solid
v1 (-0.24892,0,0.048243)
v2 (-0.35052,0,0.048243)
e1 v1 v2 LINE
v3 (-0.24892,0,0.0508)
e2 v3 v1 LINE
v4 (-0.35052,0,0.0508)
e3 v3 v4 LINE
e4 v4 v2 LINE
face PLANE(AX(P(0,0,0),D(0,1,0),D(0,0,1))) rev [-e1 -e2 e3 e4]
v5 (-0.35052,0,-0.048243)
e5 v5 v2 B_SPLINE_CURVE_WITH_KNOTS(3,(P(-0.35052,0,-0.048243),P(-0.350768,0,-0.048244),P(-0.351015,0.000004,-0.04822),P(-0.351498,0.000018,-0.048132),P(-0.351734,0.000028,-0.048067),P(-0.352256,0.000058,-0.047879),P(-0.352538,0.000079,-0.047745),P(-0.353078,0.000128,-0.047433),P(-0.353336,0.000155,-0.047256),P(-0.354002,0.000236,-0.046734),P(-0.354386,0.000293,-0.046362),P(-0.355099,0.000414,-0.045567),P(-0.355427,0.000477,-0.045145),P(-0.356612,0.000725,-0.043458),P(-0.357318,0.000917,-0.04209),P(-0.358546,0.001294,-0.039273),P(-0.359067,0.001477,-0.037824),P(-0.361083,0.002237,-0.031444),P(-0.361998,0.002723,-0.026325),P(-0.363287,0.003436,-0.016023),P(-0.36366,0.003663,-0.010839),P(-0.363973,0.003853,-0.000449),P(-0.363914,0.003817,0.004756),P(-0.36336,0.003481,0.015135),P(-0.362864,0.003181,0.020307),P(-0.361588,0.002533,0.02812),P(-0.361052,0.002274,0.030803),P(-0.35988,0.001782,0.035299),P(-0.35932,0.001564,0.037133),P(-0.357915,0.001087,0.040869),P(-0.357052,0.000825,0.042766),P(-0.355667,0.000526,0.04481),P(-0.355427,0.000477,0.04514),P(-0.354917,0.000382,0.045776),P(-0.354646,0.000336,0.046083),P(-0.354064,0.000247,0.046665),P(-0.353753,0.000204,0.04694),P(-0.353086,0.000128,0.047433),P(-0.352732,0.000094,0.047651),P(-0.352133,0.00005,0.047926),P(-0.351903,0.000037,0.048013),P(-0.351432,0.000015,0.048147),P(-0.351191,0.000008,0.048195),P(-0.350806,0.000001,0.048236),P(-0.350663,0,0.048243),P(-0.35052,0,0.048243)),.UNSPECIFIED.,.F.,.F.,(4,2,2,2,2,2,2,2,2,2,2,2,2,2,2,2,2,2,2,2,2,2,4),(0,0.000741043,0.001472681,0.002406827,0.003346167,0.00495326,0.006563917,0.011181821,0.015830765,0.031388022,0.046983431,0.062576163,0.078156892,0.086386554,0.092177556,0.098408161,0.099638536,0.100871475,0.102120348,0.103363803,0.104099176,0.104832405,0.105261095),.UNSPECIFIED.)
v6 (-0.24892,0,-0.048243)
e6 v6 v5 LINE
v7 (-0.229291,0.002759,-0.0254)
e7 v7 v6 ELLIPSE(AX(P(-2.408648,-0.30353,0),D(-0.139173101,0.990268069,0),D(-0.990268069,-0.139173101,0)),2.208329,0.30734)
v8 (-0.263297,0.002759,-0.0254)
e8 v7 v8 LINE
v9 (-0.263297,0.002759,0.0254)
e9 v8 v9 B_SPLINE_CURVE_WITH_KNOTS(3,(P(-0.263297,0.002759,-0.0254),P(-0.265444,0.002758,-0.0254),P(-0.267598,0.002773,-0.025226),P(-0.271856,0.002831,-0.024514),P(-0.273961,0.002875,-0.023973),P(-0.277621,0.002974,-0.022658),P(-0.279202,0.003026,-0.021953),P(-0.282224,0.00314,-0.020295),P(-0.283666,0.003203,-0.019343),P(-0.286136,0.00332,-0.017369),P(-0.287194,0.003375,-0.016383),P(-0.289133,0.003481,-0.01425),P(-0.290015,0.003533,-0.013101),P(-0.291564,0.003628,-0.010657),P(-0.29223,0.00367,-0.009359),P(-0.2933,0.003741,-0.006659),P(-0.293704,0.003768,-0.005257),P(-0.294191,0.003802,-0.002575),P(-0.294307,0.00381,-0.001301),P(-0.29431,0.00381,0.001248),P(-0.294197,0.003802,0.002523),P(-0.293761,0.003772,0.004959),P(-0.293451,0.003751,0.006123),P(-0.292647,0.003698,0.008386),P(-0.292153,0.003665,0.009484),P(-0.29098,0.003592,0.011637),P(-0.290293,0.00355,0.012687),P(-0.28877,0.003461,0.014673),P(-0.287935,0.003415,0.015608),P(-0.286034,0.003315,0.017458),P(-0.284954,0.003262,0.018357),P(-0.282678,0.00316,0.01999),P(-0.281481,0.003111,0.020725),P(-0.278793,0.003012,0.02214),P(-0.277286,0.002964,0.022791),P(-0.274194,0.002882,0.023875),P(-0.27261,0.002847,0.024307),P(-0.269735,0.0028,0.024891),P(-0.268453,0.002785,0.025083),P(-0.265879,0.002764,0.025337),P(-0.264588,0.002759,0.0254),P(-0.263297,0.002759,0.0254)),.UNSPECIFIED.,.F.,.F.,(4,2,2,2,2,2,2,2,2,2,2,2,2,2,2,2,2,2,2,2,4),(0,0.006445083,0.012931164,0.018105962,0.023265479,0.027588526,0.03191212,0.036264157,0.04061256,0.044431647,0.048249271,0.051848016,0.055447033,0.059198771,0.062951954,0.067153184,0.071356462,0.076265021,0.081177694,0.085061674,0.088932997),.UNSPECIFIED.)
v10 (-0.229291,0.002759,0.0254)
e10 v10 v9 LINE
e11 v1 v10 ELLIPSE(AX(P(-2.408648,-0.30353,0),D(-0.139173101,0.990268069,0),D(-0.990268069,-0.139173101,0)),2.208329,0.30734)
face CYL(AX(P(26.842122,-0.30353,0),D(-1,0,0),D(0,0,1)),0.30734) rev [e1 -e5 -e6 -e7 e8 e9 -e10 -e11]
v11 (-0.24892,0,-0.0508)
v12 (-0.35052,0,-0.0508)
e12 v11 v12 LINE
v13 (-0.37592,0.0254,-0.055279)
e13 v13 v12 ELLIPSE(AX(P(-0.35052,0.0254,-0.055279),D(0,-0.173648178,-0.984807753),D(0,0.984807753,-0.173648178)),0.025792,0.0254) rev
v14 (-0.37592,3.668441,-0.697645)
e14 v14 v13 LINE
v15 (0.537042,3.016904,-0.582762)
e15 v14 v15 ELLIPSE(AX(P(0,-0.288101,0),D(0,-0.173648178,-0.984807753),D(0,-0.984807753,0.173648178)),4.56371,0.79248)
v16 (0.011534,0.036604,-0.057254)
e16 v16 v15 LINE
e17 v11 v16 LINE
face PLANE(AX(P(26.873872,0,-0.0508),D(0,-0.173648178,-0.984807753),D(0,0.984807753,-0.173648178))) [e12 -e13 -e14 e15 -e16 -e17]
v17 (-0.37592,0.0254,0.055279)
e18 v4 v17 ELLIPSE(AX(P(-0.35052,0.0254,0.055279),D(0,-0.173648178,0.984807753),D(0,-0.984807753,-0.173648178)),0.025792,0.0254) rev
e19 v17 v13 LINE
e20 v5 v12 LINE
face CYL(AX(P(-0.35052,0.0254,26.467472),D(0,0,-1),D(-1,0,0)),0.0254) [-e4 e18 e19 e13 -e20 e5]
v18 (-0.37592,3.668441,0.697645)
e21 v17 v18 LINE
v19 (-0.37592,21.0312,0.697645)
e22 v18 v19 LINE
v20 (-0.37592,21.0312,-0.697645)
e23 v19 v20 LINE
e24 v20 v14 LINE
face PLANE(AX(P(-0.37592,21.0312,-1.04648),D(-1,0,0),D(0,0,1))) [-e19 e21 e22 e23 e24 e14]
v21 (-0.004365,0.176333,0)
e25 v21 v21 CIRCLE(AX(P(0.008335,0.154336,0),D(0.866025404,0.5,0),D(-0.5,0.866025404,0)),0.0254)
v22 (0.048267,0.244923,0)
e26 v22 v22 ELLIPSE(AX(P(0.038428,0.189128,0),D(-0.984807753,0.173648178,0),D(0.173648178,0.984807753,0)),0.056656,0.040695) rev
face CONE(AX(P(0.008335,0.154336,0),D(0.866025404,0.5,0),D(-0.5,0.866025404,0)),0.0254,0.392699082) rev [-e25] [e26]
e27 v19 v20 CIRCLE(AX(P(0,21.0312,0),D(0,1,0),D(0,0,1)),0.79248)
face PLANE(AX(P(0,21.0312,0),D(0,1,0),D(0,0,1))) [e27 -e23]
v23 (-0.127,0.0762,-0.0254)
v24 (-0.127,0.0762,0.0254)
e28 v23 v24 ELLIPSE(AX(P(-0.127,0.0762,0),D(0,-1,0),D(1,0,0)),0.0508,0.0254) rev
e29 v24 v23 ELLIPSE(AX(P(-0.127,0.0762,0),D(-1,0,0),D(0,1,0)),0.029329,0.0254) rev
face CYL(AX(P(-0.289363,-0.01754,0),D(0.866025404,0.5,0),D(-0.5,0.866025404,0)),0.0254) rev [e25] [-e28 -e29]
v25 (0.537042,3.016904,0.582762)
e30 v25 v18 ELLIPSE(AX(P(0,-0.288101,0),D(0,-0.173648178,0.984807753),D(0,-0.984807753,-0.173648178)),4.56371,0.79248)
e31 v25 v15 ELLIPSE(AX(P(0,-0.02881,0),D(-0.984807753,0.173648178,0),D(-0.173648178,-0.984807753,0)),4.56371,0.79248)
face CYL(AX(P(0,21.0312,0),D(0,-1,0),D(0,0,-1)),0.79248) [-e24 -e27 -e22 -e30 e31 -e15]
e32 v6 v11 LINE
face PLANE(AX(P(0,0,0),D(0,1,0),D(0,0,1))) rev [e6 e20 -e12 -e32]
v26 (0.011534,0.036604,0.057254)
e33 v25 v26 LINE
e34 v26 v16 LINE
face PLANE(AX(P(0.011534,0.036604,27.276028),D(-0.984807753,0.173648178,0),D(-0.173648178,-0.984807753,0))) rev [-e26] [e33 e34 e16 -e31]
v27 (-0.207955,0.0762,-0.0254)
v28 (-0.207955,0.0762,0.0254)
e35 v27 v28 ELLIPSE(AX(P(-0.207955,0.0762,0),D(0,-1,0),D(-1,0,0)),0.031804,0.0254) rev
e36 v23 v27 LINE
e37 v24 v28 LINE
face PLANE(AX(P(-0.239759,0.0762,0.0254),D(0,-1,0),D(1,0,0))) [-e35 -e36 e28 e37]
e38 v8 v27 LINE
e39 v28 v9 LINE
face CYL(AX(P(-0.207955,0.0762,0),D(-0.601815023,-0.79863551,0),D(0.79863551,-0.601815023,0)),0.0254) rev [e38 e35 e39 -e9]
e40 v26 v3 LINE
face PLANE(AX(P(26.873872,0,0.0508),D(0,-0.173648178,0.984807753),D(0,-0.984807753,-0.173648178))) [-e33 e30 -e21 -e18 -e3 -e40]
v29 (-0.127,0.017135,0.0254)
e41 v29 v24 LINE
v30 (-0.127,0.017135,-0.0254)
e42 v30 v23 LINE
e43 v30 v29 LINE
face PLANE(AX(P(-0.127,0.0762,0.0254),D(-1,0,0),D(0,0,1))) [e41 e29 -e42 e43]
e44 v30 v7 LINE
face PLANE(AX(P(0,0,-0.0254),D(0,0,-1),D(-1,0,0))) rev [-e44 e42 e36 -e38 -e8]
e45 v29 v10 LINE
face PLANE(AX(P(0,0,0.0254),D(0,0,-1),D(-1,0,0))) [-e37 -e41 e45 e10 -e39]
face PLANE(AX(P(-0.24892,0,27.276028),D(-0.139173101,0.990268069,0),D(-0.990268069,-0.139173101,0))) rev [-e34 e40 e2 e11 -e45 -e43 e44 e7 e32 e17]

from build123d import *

# Parameters (mm, degrees)
TD_SKETCH_R                             = 0.79248
TL_FEATURE_DEPTH                        = 21.0312
TDF_STD_SKETCH_W                        = 2.09296
TDF_STD_SKETCH_H                        = 2.09296
TDF_STD_FEATURE_DEPTH                   = 22.061040395
ISA_20_STD_FEATURE_DEPTH                = 22.061040395
ISA_20_STD_FEATURE_DEPTH_BACK           = 22.061040395
F_10BA_STD_FEATURE_DEPTH                = 22.061040395
F_10BA_STD_FEATURE_DEPTH_BACK           = 22.061040395
FRO_STD_FEATURE_DEPTH                   = 22.061040395
FRO_STD_FEATURE_DEPTH_BACK              = 22.061040395
C_STD_FEATURE_DEPTH                     = 22.061040395
C_STD_FEATURE_DEPTH_BACK                = 22.061040395
ERW_STD_FEATURE_DEPTH                   = 0.0254
H_STD_FEATURE_REACH                     = 22.907
H_STD_SKETCH_R                          = 0.0254
H_STD_SKETCH_3_R                        = 0.0254
FUNNEL_FINAL_DIAMETRE_STD_FEATURE_DEPTH = 2.499995
FUNNEL_FINAL_DIAMETRE_STD_FEATURE_DRAFT = -22.5
ROUND_BR_STD_FEATURE_START              = -1
ROUND_BR_STD_FEATURE_DEPTH              = 0.984425518


with BuildPart() as part:
    # TD_sketch → TL_feature (new body)
    with BuildSketch(Plane(origin=(0, 0, 0), x_dir=(1, 0, 0), z_dir=(0, 1, 0))):
        with Locations(Location((0, 0, 0), (0, 0, 270))):
            Circle(TD_SKETCH_R)
    extrude(amount=TL_FEATURE_DEPTH)

    # TDF_STD_sketch → TDF_STD_feature (cut, through all)
    with BuildSketch(Plane(origin=(0, 0, 0), x_dir=(1, 0, 0), z_dir=(0, 1, 0))):
        with Locations((-1.4224, 0)):
            Rectangle(TDF_STD_SKETCH_W, TDF_STD_SKETCH_H)
    extrude(amount=TDF_STD_FEATURE_DEPTH, mode=Mode.SUBTRACT)

    # ISA_20_STD_sketch → ISA_20_STD_feature (cut, two sides: drawn at the far end of the back side and taken through both)
    with BuildSketch(Plane(origin=(0, 0, 0), x_dir=(0, 0, -1), z_dir=(1, 0, 0)).offset(-ISA_20_STD_FEATURE_DEPTH_BACK)):
        Polygon((-12.968809457, 73.261672178), (-3.759167997, 21.0312), (-0.0508, 0), (0.0508, 0), (3.759167997, 21.0312), (12.968809457, 73.261672178), (12.968809457, -32.810750623), (-12.968809457, -32.810750623), align=None)
    extrude(amount=ISA_20_STD_FEATURE_DEPTH + ISA_20_STD_FEATURE_DEPTH_BACK, mode=Mode.SUBTRACT)

    # 10BA_STD_sketch → 10BA_STD_feature (cut, two sides: drawn at the far end of the back side and taken through both)
    with BuildSketch(Plane.XY.offset(-F_10BA_STD_FEATURE_DEPTH_BACK)):
        Polygon((-53.226091717, 0), (-0.37592, 0), (-0.24892, 0), (0.011534356, 0.036604473), (3.713447997, 21.0312), (12.890784005, 73.078458855), (91.272293615, 2.163710365), (25.155417893, -70.914748491), align=None)
    extrude(amount=F_10BA_STD_FEATURE_DEPTH + F_10BA_STD_FEATURE_DEPTH_BACK, mode=Mode.SUBTRACT)

    # FRO_STD_sketch → FRO_STD_feature (cut, two sides: drawn at the far end of the back side and taken through both)
    with BuildSketch(Plane.XY.offset(-FRO_STD_FEATURE_DEPTH_BACK)):
        with BuildLine():
            Line((-0.37592, 52.149873762), (-0.37592, 0.0254))
            ThreePointArc((-0.37592, 0.0254), (-0.368480512, 0.007439488), (-0.35052, 0))
            Line((-0.35052, 0), (51.773953762, 0))
            Line((51.773953762, 0), (-21.941183964, -73.715137726))
            Line((-21.941183964, -73.715137726), (-74.091057726, -21.565263964))
            Line((-74.091057726, -21.565263964), (-0.37592, 52.149873762))
        make_face()
    extrude(amount=FRO_STD_FEATURE_DEPTH + FRO_STD_FEATURE_DEPTH_BACK, mode=Mode.SUBTRACT)

    # C_STD_sketch → C_STD_feature (cut, two sides: drawn at the far end of the back side and taken through both)
    with BuildSketch(Plane(origin=(0, 0, 0), x_dir=(0, 0, -1), z_dir=(1, 0, 0)).offset(-C_STD_FEATURE_DEPTH_BACK)):
        with BuildLine():
            Line((-51.498419713, -8.177529753), (-0.048243287, 0))
            ThreePointArc((-0.048243287, 0), (0, 0.00381), (0.048243287, 0))
            Line((0.048243287, 0), (51.498419713, -8.177529753))
            Line((51.498419713, -8.177529753), (51.498419713, -112.369518834))
            Line((51.498419713, -112.369518834), (-51.498419713, -112.369518834))
            Line((-51.498419713, -112.369518834), (-51.498419713, -8.177529753))
        make_face()
    extrude(amount=C_STD_FEATURE_DEPTH + C_STD_FEATURE_DEPTH_BACK, mode=Mode.SUBTRACT)


with BuildPart() as body_2:
    # ERW_STD_sketch → ERW_STD_feature (new, symmetric)
    with BuildSketch(Plane.XY):
        Polygon((-0.127, 0.0762), (-0.127, 0), (-0.29718, 0), (-0.239759181, 0.0762), align=None)
    extrude(amount=ERW_STD_FEATURE_DEPTH, both=True)

    # H_STD_sketch → H_STD_feature (add, up to next)
    with BuildSketch(Plane(origin=(0.008335492, 0.154335983, 0), x_dir=(0, 0, -1), z_dir=(0.8660254037844415, 0.4999999999999953, 0)), mode=Mode.PRIVATE) as h_std_feature_sk1:
        with Locations(Location((0, 0, 0), (0, 0, 90))):
            Circle(H_STD_SKETCH_R)
    h_std_feature_tool1 = extrude(h_std_feature_sk1.sketch, amount=-H_STD_FEATURE_REACH, mode=Mode.PRIVATE) - body_2.part
    add(h_std_feature_tool1.solids().sort_by_distance((0.008335, 0.154336, 0))[0])


with BuildPart() as funnel_final_diametre_std_feature_tool:
    # H_STD_sketch<3> → funnel_final_diametre_STD_feature (with draft: the straight prism first)
    with BuildSketch(Plane(origin=(0.008335492, 0.154335983, 0), x_dir=(0, 0, -1), z_dir=(0.8660254037844415, 0.4999999999999953, 0))):
        with Locations(Location((0, 0, 0), (0, 0, 90))):
            Circle(H_STD_SKETCH_3_R)
    extrude(amount=FUNNEL_FINAL_DIAMETRE_STD_FEATURE_DEPTH)
    # funnel_final_diametre_STD_feature: the draft: its side faces are tilted about the plane it starts from
    funnel_final_diametre_std_feature_sides = [funnel_final_diametre_std_feature_tool.faces().sort_by_distance(p)[0] for p in [
        (1.103565082, 0.757337687, 0),
    ]]
    draft(funnel_final_diametre_std_feature_sides, Plane(origin=(0.008335492, 0.154335983, 0), x_dir=(0, 0, -1), z_dir=(0.8660254037844415, 0.4999999999999953, 0)), FUNNEL_FINAL_DIAMETRE_STD_FEATURE_DRAFT)


with BuildPart() as body_2_1:
    add(body_2.part)

    # funnel_final_diametre_STD_feature: add funnel_final_diametre_std_feature_tool
    add(funnel_final_diametre_std_feature_tool.part)

    # ROUND_BR_STD_feature: read off the stored shape, not the designer's step
    # ROUND_BR_STD_feature outline → ROUND_BR_STD_feature (cut)
    with BuildSketch(Plane(origin=(0, 0, 0), x_dir=(0.79863551004729, -0.601815023152052, 0), z_dir=(0.601815023152052, 0.79863551004729, 0)).offset(ROUND_BR_STD_FEATURE_START)):
        with BuildLine():
            Line((-0.237338501, -0.0254), (-0.211938501, -0.0254))
            ThreePointArc((-0.211938501, -0.0254), (-0.229899013, -0.017960512), (-0.237338501, 0))
            Line((-0.237338501, 0), (-0.237338501, -0.0254))
        make_face()
        with BuildLine():
            Line((-0.237338501, 0.0254), (-0.237338501, 0))
            ThreePointArc((-0.237338501, 0), (-0.229899013, 0.017960512), (-0.211938501, 0.0254))
            Line((-0.211938501, 0.0254), (-0.237338501, 0.0254))
        make_face()
    extrude(amount=ROUND_BR_STD_FEATURE_DEPTH, mode=Mode.SUBTRACT)


with BuildPart() as part_1:
    add(part.part)

    # COMBINE_STD_feature: cut body 2
    add(body_2_1.part, mode=Mode.SUBTRACT)


solid = part_1.part
